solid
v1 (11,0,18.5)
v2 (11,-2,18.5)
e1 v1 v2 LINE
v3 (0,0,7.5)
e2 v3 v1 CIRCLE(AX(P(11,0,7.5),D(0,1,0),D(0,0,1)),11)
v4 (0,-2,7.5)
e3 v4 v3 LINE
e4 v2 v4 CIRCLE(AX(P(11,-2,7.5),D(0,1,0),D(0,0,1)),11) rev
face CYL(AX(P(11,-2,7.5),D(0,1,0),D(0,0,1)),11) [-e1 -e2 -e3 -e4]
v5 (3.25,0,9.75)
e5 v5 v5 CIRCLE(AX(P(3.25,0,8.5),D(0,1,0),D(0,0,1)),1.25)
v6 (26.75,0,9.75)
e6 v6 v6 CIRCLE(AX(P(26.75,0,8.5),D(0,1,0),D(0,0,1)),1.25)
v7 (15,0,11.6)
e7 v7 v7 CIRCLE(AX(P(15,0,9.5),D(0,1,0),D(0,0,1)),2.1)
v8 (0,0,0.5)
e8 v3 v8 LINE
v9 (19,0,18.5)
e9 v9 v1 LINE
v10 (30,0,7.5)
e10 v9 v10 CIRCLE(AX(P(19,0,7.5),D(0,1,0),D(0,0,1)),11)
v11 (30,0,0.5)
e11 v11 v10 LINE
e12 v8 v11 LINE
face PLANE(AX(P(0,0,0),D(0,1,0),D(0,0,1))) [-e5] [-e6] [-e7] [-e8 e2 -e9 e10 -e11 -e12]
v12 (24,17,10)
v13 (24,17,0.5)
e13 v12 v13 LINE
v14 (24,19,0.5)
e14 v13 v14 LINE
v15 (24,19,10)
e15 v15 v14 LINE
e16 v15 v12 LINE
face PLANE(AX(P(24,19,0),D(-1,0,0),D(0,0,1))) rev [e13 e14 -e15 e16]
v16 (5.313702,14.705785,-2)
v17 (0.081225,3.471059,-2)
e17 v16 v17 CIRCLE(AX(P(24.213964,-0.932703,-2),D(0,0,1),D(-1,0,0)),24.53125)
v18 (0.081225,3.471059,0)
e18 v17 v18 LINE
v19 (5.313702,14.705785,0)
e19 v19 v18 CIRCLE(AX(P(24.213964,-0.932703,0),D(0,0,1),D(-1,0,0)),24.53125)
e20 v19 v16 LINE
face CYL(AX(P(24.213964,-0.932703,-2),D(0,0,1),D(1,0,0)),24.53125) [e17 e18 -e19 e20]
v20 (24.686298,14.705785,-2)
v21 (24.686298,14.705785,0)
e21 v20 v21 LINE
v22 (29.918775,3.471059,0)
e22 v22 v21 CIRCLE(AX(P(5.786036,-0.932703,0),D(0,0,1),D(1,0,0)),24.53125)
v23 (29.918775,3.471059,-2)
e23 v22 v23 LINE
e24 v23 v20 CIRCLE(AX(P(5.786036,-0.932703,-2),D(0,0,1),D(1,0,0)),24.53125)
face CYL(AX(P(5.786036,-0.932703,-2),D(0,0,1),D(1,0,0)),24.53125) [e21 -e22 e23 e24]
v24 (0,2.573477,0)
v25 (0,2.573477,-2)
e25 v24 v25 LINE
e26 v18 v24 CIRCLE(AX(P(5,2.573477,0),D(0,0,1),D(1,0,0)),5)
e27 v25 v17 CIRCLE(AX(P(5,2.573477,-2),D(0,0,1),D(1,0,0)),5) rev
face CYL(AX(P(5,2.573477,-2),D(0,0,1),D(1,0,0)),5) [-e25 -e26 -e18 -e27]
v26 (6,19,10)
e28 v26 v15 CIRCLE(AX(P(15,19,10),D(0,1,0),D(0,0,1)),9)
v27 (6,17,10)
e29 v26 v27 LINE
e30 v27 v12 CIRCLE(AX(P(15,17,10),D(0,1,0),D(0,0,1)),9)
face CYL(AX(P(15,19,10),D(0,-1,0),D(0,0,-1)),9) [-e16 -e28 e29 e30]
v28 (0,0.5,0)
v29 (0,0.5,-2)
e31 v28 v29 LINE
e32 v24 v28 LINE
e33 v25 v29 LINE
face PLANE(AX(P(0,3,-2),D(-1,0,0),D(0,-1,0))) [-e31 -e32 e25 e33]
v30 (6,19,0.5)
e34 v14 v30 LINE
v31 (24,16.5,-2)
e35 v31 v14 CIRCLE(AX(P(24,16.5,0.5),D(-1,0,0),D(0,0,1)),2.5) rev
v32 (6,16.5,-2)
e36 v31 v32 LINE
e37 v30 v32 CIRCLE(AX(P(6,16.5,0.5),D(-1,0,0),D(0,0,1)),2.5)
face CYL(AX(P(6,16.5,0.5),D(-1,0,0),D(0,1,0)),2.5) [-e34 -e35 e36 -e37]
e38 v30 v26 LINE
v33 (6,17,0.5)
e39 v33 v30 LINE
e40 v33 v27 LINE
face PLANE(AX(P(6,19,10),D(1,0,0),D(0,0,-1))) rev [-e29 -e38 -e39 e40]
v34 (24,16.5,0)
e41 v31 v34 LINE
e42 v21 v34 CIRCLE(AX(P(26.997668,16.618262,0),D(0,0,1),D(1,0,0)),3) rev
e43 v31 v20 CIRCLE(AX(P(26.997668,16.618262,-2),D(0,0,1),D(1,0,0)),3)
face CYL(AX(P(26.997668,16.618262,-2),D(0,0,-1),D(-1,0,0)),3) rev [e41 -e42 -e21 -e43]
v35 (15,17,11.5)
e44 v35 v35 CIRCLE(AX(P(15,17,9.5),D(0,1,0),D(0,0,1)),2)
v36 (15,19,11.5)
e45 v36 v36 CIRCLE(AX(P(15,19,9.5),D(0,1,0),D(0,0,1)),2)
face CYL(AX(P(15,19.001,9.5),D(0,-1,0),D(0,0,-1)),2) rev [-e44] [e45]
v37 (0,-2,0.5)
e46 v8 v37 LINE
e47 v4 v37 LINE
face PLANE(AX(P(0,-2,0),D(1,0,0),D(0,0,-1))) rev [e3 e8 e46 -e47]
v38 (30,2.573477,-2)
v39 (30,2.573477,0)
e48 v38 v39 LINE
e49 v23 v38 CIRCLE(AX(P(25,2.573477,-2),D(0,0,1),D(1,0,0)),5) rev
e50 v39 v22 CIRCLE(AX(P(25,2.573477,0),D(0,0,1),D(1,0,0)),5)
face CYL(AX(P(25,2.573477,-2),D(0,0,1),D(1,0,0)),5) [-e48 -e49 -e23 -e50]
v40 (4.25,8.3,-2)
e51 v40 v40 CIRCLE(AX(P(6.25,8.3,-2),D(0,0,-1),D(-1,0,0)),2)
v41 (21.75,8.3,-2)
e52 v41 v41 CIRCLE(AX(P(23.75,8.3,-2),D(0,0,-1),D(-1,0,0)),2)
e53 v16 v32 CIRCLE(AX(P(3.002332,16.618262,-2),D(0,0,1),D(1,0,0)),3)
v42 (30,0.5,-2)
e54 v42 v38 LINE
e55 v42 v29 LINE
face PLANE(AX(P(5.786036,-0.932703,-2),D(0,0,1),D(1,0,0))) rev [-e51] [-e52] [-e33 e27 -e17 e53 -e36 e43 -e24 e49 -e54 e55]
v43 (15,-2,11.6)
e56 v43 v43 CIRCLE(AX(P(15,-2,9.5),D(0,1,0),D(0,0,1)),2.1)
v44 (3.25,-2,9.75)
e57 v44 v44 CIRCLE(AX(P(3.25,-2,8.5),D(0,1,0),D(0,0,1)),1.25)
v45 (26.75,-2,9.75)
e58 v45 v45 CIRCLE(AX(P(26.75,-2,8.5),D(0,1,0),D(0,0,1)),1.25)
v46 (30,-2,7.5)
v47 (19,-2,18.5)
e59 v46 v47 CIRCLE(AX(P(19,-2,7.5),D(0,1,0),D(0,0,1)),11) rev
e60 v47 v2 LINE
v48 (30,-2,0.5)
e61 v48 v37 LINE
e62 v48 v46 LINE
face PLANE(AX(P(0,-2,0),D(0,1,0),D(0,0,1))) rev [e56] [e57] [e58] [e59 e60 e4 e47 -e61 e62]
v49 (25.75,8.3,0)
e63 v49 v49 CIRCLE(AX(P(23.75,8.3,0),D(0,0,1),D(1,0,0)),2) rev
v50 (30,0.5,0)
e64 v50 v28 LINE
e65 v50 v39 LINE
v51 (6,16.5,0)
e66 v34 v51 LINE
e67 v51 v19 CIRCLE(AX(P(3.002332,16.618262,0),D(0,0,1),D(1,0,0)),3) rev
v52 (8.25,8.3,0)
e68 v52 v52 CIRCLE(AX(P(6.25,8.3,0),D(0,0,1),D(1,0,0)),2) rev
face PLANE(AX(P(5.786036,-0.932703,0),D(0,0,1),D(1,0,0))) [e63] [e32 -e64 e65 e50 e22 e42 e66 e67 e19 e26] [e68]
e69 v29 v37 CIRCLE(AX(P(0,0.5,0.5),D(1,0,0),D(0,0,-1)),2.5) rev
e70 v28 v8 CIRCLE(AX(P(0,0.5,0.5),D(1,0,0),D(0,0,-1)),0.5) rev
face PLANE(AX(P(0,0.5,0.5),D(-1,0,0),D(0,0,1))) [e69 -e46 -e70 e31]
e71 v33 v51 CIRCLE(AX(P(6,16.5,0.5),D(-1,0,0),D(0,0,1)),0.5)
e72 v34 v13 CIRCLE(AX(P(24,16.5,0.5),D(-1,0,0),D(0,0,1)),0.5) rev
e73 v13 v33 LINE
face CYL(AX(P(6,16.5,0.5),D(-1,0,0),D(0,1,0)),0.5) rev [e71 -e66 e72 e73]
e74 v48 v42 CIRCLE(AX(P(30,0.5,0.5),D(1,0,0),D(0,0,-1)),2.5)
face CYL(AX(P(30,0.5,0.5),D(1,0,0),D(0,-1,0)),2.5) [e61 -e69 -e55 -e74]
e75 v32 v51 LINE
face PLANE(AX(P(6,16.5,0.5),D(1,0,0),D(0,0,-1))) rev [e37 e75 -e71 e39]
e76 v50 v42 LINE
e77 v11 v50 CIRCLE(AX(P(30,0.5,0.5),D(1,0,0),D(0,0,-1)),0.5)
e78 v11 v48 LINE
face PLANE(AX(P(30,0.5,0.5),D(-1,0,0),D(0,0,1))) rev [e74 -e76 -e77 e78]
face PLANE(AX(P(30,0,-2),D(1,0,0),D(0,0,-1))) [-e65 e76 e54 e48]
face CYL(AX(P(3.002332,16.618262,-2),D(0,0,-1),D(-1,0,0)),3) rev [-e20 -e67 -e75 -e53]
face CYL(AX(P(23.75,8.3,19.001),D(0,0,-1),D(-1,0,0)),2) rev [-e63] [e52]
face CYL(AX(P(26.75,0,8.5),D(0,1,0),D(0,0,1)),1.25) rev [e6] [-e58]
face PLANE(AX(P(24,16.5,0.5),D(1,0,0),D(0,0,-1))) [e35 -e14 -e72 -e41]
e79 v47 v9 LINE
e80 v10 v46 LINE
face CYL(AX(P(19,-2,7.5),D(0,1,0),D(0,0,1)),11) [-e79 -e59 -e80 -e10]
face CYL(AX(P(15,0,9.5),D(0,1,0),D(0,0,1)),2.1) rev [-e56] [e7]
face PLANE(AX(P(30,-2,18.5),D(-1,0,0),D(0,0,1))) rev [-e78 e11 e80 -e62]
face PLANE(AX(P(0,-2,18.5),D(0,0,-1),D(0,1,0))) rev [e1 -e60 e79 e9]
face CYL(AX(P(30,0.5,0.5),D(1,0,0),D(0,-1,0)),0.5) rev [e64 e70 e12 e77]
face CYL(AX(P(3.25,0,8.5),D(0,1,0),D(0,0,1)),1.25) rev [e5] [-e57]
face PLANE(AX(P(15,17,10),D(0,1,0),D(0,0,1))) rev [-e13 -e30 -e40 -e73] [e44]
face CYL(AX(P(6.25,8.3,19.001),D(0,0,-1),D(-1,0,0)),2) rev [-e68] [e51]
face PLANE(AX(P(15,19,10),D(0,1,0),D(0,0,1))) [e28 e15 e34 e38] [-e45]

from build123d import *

# Parameters (mm, degrees)
BRIDA_BASE1_DEPTH                = 2
REDONDEO5MM_R                    = 5
REDONDEO3MM_R                    = 3
BRIDA_DE_ARISTA1_STRIP_W         = 9
BRIDA_DE_ARISTA1_STRIP_H         = 2
BRIDA_DE_ARISTA1_STRIP_CUT_DEPTH = 30
BRIDA_DE_ARISTA1_DEPTH           = 30
BRIDA_DE_ARISTA2_DEPTH           = 18
BRIDA_START                      = 2
BRIDA_DE_ARISTA2_FLAT_DEPTH      = 2
CORTAR_EXTRUIR6_REACH            = 43.255
CROQUIS26_R                      = 2
REDONDEO11MM_R                   = 11
TALADRO_ROSCADO_M32_D            = 2.5
TALADRO_ROSCADO_M32_DEPTH        = 20.65
TALADRO_ROSCADO_M32_TIP          = 0.751075774
TALADRO_ROSCADO_M52_D            = 4.2
TALADRO_ROSCADO_M52_DEPTH        = 2
CORTAR_EXTRUIR7_REACH            = 42.274
CROQUIS36_R                      = 2


# Sheet-metal steps are written as plain solids
with BuildPart() as part:
    # Croquis1 → Brida base1 (new body)
    with BuildSketch(Plane.XY):
        with BuildLine():
            Line((0, 0), (30, 0))
            Line((30, 0), (30, 3))
            ThreePointArc((30, 3), (27.901523057, 9.682731068), (24, 15.5))
            Line((24, 15.5), (24, 16.5))
            Line((24, 16.5), (6, 16.5))
            Line((6, 16.5), (6, 15.5))
            ThreePointArc((6, 15.5), (2.098476943, 9.682731068), (0, 3))
            Line((0, 3), (0, 0))
        make_face()
    extrude(amount=-BRIDA_BASE1_DEPTH)

    # Redondeo5mm
    redondeo5mm_edges = [part.edges().sort_by_distance(p)[0] for p in [
        (0, 3, -1),
        (30, 3, -1),
    ]]
    fillet(redondeo5mm_edges, radius=REDONDEO5MM_R)

    # Redondeo3mm
    # the kernel refuses this fillet: 3 mm, written as the material it adds along each edge
    with BuildSketch(Plane(origin=(24, 15.5, 0), x_dir=(0, 1, 0), z_dir=(0, 0, -1))) as redondeo3mm_piece_1:
        with BuildLine():
            CenterArc((1.118262022, 2.997668109), REDONDEO3MM_R, 230.394906527, 37.345869832)
            Line((-0.794215431, 0.686298387), (-0.83246498, 0.640070993))
            ThreePointArc((-0.83246498, 0.640070993), (-0.432666371, 0.301999114), (-0.040192089, -0.044548805))
            Line((-0.040192089, -0.044548805), (0, -0.06))
            ThreePointArc((0, -0.06), (0.5, -0.06), (0.99763476, -0.059953362))
            Line((0.99763476, -0.059953362), (1, 0))
        make_face()
    extrude(amount=2)
    with BuildSketch(Plane(origin=(6, 15.5, 0), x_dir=(-0.6538299662985165, -0.75664151034032, 0), z_dir=(0, 0, -1))) as redondeo3mm_piece_2:
        with BuildLine():
            CenterArc((1.113841774, 2.999313346), REDONDEO3MM_R, 231.428232408, 37.345869832)
            Line((-0.75664151, 0.653829966), (-0.794051176, 0.606920299))
            ThreePointArc((-0.794051176, 0.606920299), (-0.417550553, 0.281516493), (-0.039229798, -0.045398491))
            Line((-0.039229798, -0.045398491), (0.001283659, -0.059986267))
            ThreePointArc((0.001283659, -0.059986267), (0.524829407, -0.054385173), (1.048375155, -0.059986267))
            Line((1.048375155, -0.059986267), (1.049658814, 0))
        make_face()
    extrude(amount=2)

    # Brida de arista1 strip (across the edge) → Brida de arista1 strip cut (cut)
    with BuildSketch(Plane.YZ):
        with Locations((-4, -1)):
            Rectangle(BRIDA_DE_ARISTA1_STRIP_W, BRIDA_DE_ARISTA1_STRIP_H)
    extrude(amount=BRIDA_DE_ARISTA1_STRIP_CUT_DEPTH, mode=Mode.SUBTRACT)

    # Brida de arista1 section (across the edge) → Brida de arista1 (add)
    with BuildSketch(Plane.YZ):
        with BuildLine():
            Line((-2, 0.5), (-2, 18.5))
            Line((-2, 18.5), (0, 18.5))
            Line((0, 18.5), (0, 0.5))
            ThreePointArc((0, 0.5), (0.146446609, 0.146446609), (0.5, 0))
            Line((0.5, 0), (0.5, -2))
            ThreePointArc((0.5, -2), (-1.267766953, -1.267766953), (-2, 0.5))
        make_face()
    extrude(amount=BRIDA_DE_ARISTA1_DEPTH)

    # Brida de arista2 bend section (across the edge) → Brida de arista2 (add)
    with BuildSketch(Plane(origin=(24, 17, 0), x_dir=(0, -1, 0), z_dir=(-1, 0, 0))):
        with BuildLine():
            Line((-2, 0.5), (0, 0.5))
            ThreePointArc((0, 0.5), (0.146446609, 0.146446609), (0.5, 0))
            Line((0.5, 0), (0.5, -2))
            ThreePointArc((0.5, -2), (-1.267766953, -1.267766953), (-2, 0.5))
        make_face()
    extrude(amount=BRIDA_DE_ARISTA2_DEPTH)

    # Brida de arista2 profile (on flange) → Brida de arista2 flat (add)
    with BuildSketch(Plane(origin=(0, 17, 0), x_dir=(-1, 0, 0), z_dir=(0, 1, 0)).offset(BRIDA_START)):
        with BuildLine():
            ThreePointArc((-6, 10), (-15, 19), (-24, 10))
            Line((-24, 10), (-24, 0.5))
            Line((-24, 0.5), (-6, 0.5))
            Line((-6, 0.5), (-6, 10))
        make_face()
    extrude(amount=-BRIDA_DE_ARISTA2_FLAT_DEPTH)

    # Croquis26 → Cortar-Extruir6 (cut, up to next)
    with BuildSketch(Plane(origin=(0, 0, -2), x_dir=(-1, 0, 0), z_dir=(0, 0, -1)), mode=Mode.PRIVATE) as cortar_extruir6_sk1:
        with Locations((-6.25, 8.3)):
            Circle(CROQUIS26_R)
    cortar_extruir6_tool1 = extrude(cortar_extruir6_sk1.sketch, amount=-CORTAR_EXTRUIR6_REACH, mode=Mode.PRIVATE) & part.part
    # Croquis26 → Cortar-Extruir6 (cut, up to next)
    with BuildSketch(Plane(origin=(0, 0, -2), x_dir=(-1, 0, 0), z_dir=(0, 0, -1)), mode=Mode.PRIVATE) as cortar_extruir6_sk2:
        with Locations((-23.75, 8.3)):
            Circle(CROQUIS26_R)
    cortar_extruir6_tool2 = extrude(cortar_extruir6_sk2.sketch, amount=-CORTAR_EXTRUIR6_REACH, mode=Mode.PRIVATE) & part.part
    add(cortar_extruir6_tool1.solids().sort_by_distance((6.25, 8.3, -2))[0], mode=Mode.SUBTRACT)
    add(cortar_extruir6_tool2.solids().sort_by_distance((23.75, 8.3, -2))[0], mode=Mode.SUBTRACT)

    # Redondeo11mm
    redondeo11mm_edges = [part.edges().sort_by_distance(p)[0] for p in [
        (0, -1, 18.5),
        (30, -1, 18.5),
    ]]
    fillet(redondeo11mm_edges, radius=REDONDEO11MM_R)

    # Taladro roscado M32
    with Locations(Plane(origin=(0, 0, 0), x_dir=(1, 0, 0), z_dir=(0, 1, 0))):
        with Locations((3.25, -8.5), (26.75, -8.5)):
            Hole(TALADRO_ROSCADO_M32_D / 2, depth=TALADRO_ROSCADO_M32_DEPTH)
            with Locations((0, 0, -(TALADRO_ROSCADO_M32_DEPTH + TALADRO_ROSCADO_M32_TIP / 2))):  # 118° drill point
                Cone(0, TALADRO_ROSCADO_M32_D / 2, TALADRO_ROSCADO_M32_TIP, mode=Mode.SUBTRACT)

    # Taladro roscado M52
    with Locations(Plane(origin=(3.715500562, 0, 2.638137214), x_dir=(1, 0, 0), z_dir=(0, 1, 0))):
        with Locations((11.284499438, -6.861862786)):
            Hole(TALADRO_ROSCADO_M52_D / 2, depth=TALADRO_ROSCADO_M52_DEPTH)

    # Croquis36 → Cortar-Extruir7 (cut, up to next)
    with BuildSketch(Plane(origin=(0, 17, 0), x_dir=(1, 0, 0), z_dir=(0, 1, 0)), mode=Mode.PRIVATE) as cortar_extruir7_sk1:
        with Locations(Location((15, -9.5, 0), (0, 0, 270))):
            Circle(CROQUIS36_R)
    cortar_extruir7_tool1 = extrude(cortar_extruir7_sk1.sketch, amount=CORTAR_EXTRUIR7_REACH, mode=Mode.PRIVATE) & part.part
    add(cortar_extruir7_tool1.solids().sort_by_distance((15, 17, 9.5))[0], mode=Mode.SUBTRACT)


solid = part.part
